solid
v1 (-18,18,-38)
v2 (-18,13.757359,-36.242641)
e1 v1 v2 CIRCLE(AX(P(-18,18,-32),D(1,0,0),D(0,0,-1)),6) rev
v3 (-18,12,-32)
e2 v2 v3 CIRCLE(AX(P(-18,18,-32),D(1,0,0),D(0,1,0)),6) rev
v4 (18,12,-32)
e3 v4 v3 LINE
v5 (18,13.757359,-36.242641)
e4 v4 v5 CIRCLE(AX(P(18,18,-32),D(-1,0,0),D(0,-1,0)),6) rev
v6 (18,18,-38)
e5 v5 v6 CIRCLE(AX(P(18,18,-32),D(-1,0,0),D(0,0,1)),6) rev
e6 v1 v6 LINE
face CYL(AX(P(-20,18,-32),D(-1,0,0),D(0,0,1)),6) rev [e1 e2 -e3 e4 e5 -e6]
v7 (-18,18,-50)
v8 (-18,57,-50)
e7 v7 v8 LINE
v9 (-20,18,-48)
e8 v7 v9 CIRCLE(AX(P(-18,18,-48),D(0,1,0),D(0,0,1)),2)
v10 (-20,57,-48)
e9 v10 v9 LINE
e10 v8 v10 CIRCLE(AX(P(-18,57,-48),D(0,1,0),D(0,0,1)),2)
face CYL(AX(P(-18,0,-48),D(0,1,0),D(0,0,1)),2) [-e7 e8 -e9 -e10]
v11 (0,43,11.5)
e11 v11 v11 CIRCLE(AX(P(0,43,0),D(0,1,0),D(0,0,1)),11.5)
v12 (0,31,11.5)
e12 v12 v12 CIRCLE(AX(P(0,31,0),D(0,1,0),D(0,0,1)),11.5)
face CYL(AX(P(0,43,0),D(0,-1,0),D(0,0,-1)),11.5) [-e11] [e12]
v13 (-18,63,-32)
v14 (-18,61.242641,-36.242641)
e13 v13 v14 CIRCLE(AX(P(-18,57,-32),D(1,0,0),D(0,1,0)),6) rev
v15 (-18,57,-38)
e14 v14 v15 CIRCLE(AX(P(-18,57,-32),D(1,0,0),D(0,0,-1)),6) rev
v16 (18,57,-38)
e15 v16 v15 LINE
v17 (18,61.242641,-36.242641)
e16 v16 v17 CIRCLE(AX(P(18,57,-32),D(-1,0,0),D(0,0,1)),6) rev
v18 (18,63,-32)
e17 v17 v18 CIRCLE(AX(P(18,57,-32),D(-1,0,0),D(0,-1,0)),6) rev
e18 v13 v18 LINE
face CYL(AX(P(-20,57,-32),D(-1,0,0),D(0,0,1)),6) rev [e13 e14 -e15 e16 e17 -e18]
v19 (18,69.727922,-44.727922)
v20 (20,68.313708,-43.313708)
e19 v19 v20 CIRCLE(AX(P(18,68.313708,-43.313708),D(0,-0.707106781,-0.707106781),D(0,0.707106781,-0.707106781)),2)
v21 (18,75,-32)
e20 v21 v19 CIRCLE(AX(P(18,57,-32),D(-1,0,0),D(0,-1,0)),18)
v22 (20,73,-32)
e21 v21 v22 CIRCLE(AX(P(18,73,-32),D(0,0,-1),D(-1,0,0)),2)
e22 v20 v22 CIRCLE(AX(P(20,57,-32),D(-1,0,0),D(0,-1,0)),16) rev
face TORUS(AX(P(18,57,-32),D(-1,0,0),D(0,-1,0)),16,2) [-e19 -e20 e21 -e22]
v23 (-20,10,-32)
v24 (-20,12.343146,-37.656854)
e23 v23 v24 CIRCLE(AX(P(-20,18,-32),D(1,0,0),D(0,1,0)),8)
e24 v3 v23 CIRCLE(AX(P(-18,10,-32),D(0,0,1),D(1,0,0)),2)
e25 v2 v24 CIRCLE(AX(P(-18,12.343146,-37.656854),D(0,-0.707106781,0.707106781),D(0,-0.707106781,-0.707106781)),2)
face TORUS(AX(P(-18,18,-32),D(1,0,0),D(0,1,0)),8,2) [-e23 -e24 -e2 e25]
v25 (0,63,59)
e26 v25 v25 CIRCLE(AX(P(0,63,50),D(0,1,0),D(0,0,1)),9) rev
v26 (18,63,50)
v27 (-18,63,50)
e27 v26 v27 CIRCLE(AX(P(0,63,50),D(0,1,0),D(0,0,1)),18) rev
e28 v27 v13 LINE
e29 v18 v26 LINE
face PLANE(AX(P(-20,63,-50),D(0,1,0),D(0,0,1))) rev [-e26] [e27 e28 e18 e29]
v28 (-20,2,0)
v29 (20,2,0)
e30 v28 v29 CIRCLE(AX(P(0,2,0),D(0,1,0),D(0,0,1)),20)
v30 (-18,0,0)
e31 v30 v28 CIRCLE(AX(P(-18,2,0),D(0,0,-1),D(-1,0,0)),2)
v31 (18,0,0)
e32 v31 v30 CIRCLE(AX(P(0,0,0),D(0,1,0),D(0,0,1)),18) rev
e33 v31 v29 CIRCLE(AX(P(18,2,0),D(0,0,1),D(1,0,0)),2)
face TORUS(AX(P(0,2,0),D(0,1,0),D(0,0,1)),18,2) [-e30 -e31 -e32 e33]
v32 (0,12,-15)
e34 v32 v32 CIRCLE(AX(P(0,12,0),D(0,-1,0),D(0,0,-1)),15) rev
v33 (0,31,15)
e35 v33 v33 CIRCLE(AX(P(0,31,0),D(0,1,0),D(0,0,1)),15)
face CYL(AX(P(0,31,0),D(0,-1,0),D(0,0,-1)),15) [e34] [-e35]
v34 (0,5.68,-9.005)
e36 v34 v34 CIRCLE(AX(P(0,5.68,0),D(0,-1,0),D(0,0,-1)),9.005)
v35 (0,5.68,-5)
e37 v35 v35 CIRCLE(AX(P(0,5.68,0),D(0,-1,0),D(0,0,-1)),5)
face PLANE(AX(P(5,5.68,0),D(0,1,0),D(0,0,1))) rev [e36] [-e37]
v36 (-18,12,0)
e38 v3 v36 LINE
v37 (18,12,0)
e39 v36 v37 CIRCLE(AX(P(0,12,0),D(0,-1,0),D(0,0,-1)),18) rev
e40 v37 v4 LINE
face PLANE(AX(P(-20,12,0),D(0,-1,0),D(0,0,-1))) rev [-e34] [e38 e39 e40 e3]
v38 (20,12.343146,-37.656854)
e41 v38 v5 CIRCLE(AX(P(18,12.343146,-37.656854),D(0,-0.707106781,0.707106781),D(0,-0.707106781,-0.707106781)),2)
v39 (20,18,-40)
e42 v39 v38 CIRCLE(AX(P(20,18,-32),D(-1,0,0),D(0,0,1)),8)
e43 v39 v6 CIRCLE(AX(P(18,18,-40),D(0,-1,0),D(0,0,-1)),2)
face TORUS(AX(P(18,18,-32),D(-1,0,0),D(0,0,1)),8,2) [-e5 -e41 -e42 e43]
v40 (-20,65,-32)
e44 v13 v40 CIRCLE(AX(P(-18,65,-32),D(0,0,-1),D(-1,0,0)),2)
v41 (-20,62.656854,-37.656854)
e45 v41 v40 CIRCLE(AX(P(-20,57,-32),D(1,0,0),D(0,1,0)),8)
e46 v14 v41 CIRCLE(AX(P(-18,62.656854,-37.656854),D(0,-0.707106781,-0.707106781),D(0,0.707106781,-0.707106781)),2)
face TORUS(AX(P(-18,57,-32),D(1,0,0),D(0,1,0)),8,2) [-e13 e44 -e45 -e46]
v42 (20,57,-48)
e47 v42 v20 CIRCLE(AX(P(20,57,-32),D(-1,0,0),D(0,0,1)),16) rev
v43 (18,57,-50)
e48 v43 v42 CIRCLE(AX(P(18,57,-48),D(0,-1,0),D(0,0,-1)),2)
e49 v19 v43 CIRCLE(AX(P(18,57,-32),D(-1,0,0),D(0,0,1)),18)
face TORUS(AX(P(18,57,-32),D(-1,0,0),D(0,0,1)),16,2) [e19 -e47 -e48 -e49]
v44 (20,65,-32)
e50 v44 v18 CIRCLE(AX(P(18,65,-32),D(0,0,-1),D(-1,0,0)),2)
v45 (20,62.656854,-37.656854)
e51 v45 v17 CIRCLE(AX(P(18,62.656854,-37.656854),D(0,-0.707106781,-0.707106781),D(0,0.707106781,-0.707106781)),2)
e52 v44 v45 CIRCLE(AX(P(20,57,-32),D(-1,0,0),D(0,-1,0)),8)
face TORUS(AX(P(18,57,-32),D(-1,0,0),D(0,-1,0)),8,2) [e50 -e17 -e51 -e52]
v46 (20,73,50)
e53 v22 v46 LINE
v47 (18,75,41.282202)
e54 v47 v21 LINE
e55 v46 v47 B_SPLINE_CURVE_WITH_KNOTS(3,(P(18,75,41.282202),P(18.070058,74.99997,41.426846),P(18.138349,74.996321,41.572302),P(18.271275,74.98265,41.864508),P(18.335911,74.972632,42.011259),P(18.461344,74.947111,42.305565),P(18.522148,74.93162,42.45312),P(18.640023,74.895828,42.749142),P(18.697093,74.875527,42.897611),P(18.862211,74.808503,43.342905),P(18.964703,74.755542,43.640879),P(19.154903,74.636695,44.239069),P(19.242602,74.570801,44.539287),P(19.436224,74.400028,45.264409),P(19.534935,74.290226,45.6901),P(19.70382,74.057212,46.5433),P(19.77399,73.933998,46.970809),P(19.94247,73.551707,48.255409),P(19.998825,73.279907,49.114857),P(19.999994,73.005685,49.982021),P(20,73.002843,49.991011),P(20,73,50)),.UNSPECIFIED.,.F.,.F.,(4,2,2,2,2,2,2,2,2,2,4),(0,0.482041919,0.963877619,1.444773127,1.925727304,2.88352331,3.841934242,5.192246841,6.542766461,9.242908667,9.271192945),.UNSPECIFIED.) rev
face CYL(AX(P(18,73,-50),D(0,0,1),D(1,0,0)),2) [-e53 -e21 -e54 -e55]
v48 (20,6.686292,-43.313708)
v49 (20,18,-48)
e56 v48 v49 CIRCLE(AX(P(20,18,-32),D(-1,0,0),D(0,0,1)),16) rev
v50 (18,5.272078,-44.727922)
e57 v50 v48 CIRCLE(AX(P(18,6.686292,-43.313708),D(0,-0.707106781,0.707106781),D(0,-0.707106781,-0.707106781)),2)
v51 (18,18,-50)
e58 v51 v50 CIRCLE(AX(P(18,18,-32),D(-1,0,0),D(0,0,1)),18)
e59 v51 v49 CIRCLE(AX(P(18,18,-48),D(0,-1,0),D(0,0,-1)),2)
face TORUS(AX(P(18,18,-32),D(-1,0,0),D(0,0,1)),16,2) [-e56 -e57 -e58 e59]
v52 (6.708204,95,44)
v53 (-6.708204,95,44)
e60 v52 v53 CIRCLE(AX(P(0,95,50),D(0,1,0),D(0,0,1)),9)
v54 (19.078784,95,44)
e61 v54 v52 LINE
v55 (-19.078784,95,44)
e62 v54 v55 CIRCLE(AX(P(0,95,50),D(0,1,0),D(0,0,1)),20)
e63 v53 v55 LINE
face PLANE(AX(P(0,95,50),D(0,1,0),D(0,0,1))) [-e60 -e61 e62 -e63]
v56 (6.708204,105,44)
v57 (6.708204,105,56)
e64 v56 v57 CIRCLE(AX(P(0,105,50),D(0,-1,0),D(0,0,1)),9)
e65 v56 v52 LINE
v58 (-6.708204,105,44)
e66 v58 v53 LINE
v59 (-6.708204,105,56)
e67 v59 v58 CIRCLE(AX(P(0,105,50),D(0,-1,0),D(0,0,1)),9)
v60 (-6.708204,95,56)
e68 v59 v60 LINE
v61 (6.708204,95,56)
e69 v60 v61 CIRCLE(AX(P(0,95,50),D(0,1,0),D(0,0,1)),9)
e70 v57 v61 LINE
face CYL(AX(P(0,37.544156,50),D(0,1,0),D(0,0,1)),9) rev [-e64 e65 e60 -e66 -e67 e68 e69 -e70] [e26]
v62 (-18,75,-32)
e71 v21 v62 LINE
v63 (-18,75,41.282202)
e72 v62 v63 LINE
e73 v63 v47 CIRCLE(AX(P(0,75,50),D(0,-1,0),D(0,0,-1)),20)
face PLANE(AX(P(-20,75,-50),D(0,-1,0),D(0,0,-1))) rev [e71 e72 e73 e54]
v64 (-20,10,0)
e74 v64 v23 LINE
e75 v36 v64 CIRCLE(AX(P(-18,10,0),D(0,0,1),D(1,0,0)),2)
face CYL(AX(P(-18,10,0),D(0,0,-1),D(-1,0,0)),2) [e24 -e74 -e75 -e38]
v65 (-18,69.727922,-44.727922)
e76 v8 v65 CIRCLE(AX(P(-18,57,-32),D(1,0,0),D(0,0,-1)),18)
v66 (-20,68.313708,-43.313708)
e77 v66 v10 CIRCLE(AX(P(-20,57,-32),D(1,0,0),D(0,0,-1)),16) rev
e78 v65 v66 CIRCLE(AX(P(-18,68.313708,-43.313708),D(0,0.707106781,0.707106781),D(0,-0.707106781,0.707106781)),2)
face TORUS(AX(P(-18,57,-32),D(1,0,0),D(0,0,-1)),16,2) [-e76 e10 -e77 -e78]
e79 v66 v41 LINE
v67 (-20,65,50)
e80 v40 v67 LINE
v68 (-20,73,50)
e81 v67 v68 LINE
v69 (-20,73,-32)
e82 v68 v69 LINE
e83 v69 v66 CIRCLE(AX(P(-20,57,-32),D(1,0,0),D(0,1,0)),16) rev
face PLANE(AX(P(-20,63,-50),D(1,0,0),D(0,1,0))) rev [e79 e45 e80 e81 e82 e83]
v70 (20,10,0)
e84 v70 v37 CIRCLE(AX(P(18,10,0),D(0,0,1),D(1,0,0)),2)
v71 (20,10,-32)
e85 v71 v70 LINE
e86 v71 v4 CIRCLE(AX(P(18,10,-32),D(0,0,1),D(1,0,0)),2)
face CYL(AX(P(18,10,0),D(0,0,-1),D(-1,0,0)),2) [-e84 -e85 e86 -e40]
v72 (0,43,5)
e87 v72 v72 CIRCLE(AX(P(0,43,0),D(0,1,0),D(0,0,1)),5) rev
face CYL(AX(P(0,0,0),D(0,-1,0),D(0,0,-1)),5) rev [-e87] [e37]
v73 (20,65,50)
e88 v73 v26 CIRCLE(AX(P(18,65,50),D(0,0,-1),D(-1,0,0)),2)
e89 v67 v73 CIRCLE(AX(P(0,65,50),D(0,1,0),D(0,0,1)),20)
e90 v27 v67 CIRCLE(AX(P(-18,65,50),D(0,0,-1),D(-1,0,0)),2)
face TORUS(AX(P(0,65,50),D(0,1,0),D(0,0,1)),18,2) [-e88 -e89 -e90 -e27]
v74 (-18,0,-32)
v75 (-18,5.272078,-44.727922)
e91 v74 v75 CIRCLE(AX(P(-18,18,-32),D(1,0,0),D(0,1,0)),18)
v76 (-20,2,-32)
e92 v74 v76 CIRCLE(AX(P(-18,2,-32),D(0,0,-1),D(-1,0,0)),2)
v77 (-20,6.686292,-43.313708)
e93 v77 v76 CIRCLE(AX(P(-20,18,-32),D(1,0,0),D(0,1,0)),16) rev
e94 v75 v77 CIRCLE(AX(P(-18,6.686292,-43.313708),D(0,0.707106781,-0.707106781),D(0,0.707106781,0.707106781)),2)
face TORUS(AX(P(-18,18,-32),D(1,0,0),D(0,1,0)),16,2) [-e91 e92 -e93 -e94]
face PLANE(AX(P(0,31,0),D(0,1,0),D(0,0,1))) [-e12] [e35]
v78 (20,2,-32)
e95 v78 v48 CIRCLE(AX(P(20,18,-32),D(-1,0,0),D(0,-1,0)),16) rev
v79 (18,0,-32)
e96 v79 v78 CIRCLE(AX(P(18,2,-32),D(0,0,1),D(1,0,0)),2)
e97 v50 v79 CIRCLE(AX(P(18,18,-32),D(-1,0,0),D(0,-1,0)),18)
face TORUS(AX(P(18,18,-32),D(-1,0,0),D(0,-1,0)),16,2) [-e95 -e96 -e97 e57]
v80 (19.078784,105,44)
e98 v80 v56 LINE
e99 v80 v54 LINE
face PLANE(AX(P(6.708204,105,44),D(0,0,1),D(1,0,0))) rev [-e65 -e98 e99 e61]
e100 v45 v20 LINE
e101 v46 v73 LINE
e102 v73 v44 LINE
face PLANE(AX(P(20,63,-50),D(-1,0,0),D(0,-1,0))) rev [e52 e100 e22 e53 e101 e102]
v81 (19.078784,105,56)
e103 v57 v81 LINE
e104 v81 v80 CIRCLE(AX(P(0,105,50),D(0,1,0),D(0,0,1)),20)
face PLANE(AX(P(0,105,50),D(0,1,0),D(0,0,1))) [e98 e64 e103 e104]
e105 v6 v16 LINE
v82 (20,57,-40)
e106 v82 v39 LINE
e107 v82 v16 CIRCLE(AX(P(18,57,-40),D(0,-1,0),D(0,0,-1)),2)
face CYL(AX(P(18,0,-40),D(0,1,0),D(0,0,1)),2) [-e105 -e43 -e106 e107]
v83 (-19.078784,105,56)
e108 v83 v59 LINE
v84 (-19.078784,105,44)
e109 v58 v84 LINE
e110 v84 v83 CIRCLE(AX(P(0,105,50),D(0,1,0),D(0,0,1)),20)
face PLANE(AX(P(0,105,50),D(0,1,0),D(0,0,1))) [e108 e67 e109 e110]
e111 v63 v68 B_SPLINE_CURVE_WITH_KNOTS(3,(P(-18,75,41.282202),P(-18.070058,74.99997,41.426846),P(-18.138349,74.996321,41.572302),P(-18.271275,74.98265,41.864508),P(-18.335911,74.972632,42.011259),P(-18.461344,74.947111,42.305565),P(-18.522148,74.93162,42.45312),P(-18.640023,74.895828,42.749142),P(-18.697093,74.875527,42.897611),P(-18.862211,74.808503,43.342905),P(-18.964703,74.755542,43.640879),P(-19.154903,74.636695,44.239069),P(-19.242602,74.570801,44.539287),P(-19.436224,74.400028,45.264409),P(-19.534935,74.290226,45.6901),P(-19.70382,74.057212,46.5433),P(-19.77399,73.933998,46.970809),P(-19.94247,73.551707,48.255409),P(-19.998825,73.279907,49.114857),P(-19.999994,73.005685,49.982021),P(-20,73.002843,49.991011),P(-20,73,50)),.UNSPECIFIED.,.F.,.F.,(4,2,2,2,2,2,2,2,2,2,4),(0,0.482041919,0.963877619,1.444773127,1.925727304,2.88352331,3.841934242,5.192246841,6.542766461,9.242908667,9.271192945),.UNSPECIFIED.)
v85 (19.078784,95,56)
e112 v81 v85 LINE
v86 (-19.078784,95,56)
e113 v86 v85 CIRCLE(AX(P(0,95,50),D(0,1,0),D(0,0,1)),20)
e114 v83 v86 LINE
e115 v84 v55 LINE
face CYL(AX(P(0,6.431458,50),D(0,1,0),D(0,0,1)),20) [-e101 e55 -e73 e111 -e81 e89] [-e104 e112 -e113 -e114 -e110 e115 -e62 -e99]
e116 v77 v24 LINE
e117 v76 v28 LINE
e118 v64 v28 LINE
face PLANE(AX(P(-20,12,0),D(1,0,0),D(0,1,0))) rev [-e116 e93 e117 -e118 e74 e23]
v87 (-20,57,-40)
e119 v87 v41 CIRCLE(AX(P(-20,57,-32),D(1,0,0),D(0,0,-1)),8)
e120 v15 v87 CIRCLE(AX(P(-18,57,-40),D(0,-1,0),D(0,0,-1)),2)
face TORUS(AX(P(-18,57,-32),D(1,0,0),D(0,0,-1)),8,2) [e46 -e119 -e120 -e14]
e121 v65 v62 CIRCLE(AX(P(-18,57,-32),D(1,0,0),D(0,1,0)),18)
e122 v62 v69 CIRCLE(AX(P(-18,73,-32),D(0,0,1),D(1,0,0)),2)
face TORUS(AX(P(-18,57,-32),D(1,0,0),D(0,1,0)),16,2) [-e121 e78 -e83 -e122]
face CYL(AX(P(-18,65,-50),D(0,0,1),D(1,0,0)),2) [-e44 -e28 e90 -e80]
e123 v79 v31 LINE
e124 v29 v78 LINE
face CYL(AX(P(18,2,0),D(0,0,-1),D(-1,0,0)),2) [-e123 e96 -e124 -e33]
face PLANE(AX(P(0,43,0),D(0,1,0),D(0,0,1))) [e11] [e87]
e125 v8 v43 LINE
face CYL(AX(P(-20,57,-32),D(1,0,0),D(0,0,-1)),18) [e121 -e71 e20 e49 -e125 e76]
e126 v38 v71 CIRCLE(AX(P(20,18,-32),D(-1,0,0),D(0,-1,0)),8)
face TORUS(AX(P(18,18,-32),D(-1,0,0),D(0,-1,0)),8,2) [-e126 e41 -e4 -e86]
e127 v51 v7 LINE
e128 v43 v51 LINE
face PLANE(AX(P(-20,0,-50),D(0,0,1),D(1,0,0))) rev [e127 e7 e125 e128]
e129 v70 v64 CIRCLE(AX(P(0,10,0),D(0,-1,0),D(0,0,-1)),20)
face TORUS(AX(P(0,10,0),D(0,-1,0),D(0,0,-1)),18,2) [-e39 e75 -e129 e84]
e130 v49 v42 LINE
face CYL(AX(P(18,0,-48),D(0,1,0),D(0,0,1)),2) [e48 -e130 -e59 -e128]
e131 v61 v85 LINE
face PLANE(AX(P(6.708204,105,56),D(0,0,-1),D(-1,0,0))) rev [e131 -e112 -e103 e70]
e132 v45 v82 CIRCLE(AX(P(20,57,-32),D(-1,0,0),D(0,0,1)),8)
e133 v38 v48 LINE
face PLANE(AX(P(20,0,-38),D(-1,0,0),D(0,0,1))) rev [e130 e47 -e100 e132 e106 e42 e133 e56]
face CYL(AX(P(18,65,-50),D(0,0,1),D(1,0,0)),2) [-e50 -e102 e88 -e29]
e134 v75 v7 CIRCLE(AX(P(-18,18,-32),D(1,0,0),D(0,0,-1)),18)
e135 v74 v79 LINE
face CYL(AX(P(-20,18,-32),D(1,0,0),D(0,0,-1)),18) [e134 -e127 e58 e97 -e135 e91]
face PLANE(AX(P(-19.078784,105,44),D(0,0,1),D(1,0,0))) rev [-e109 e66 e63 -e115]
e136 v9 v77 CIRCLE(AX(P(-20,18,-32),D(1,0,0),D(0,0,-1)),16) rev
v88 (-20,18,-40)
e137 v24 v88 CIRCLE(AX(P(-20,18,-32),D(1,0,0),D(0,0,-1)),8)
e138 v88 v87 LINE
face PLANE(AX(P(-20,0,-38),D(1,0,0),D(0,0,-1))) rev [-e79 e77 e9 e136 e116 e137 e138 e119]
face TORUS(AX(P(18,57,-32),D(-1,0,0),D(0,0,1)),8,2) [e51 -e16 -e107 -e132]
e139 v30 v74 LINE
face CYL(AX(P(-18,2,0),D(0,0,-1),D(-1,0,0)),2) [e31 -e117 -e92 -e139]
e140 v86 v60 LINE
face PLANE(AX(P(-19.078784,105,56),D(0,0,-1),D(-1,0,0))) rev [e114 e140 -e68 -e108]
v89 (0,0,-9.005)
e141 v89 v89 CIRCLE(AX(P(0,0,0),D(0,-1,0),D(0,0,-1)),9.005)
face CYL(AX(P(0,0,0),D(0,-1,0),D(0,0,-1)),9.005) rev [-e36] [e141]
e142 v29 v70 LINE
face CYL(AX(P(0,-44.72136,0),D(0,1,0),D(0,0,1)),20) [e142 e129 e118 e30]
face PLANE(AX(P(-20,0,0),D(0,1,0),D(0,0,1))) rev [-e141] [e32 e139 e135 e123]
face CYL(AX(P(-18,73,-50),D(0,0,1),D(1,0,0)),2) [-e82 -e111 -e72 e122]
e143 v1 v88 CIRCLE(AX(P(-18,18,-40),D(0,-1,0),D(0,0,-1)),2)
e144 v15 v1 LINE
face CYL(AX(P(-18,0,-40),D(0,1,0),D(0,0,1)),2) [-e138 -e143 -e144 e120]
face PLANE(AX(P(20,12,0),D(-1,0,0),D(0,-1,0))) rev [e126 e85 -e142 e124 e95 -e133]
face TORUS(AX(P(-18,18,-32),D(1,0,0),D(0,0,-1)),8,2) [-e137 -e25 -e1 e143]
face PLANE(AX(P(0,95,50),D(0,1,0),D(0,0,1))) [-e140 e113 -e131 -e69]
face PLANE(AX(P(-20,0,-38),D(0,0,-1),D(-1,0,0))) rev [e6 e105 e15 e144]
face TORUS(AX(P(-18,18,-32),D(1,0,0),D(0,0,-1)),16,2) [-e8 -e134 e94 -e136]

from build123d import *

# Parameters (mm, degrees)
SKETCH3_W                               = 40
SKETCH3_H                               = 12
BOSS_EXTRUDE1_DEPTH                     = 12
SKETCH5_R                               = 20
BOSS_EXTRUDE2_DEPTH                     = 20
BOSS_EXTRUDE2_DIRECTION_2_REACH         = 94.331
SKETCH7_R                               = 11.5
BOSS_EXTRUDE4_DEPTH                     = 31
SKETCH8_R                               = 15
BOSS_EXTRUDE5_DEPTH                     = 19
SKETCH9_R                               = 9
CUT_EXTRUDE1_DEPTH                      = 32
BOSS_EXTRUDE6_START                     = 10
BOSS_EXTRUDE6_DEPTH                     = 10
CBORE_FOR_M8_HEX_HEAD_BOLT1_D           = 10
CBORE_FOR_M8_HEX_HEAD_BOLT1_DEPTH       = 43
CBORE_FOR_M8_HEX_HEAD_BOLT1_CBORE_D     = 18.01
CBORE_FOR_M8_HEX_HEAD_BOLT1_CBORE_DEPTH = 5.68
CBORE_FOR_M8_HEX_HEAD_BOLT1_TIP         = 3.004303095
FILLET2_R                               = 18
FILLET3_R                               = 2
FILLET4_R                               = 6
FILLET5_R                               = 2


with BuildPart() as part:
    # Sweep1: sweep along a path in Sketch2
    with BuildLine(Plane(origin=(0, 0, 0), x_dir=(0, 0, -1), z_dir=(1, 0, 0))) as sweep1_path:
        Line((0, 0), (50, 0))
        Line((50, 0), (50, 75))
        Line((50, 75), (-50, 75))
    # Sketch3 → Sweep1 (sweep)
    with BuildSketch(Plane.XY):
        with Locations((0, 6)):
            Rectangle(SKETCH3_W, SKETCH3_H)
    sweep(path=sweep1_path.line, transition=Transition.RIGHT)

    # Sketch4 → Boss-Extrude1 (add)
    with BuildSketch(Plane(origin=(0, 12, 0), x_dir=(1, 0, 0), z_dir=(0, 1, 0))):
        with BuildLine():
            Line((-20, 0), (20, 0))
            ThreePointArc((20, 0), (0, -20), (-20, 0))
        make_face()
    extrude(amount=-BOSS_EXTRUDE1_DEPTH)

    # Sketch5 → Boss-Extrude2 (add)
    with BuildSketch(Plane(origin=(0, 75, 0), x_dir=(1, 0, 0), z_dir=(0, 1, 0))):
        with Locations(Location((0, -50, 0), (0, 0, 270))):
            Circle(SKETCH5_R)
    extrude(amount=BOSS_EXTRUDE2_DEPTH)

    # Boss-Extrude2 direction 2: up to this face of the body (flat: up to its plane)
    boss_extrude2_direction_2_end = Plane(part.part.faces().sort_by_distance((0, 63, 6))[0])
    # Sketch5 → Boss-Extrude2 direction 2 (add, up to the picked face)
    with BuildSketch(Plane(origin=(0, 75, 0), x_dir=(1, 0, 0), z_dir=(0, 1, 0)), mode=Mode.PRIVATE) as boss_extrude2_direction_2_sk1:
        with Locations(Location((0, -50, 0), (0, 0, 270))):
            Circle(SKETCH5_R)
    boss_extrude2_direction_2_tool1 = split(extrude(boss_extrude2_direction_2_sk1.sketch, amount=-BOSS_EXTRUDE2_DIRECTION_2_REACH, mode=Mode.PRIVATE), bisect_by=boss_extrude2_direction_2_end, keep=Keep.BOTH, mode=Mode.PRIVATE)
    add(boss_extrude2_direction_2_tool1.solids().sort_by(Axis((0, 75, 50), (0, -1, 0)))[0])

    # Sketch7 → Boss-Extrude4 (add)
    with BuildSketch(Plane(origin=(0, 12, 0), x_dir=(1, 0, 0), z_dir=(0, 1, 0))):
        with Locations(Location((0, 0, 0), (0, 0, 90))):
            Circle(SKETCH7_R)
    extrude(amount=BOSS_EXTRUDE4_DEPTH)

    # Sketch8 → Boss-Extrude5 (add)
    with BuildSketch(Plane(origin=(0, 12, 0), x_dir=(1, 0, 0), z_dir=(0, 1, 0))):
        with Locations(Location((0, 0, 0), (0, 0, 90))):
            Circle(SKETCH8_R)
    extrude(amount=BOSS_EXTRUDE5_DEPTH)

    # Sketch9 → Cut-Extrude1 (cut)
    with BuildSketch(Plane(origin=(0, 95, 0), x_dir=(1, 0, 0), z_dir=(0, 1, 0))):
        with Locations(Location((0, -50, 0), (0, 0, 270))):
            Circle(SKETCH9_R)
    extrude(amount=-CUT_EXTRUDE1_DEPTH, mode=Mode.SUBTRACT)

    # Sketch10 → Boss-Extrude6 (add)
    with BuildSketch(Plane(origin=(0, 95, 0), x_dir=(1, 0, 0), z_dir=(0, 1, 0)).offset(BOSS_EXTRUDE6_START)):
        with BuildLine():
            Line((-19.078784028, -44), (-6.708203932, -44))
            ThreePointArc((-6.708203932, -44), (-9, -50), (-6.708203932, -56))
            Line((-6.708203932, -56), (-19.078784028, -56))
            ThreePointArc((-19.078784028, -56), (-20, -50), (-19.078784028, -44))
        make_face()
        with BuildLine():
            Line((6.708203932, -44), (19.078784028, -44))
            ThreePointArc((19.078784028, -44), (20, -50), (19.078784028, -56))
            Line((19.078784028, -56), (6.708203932, -56))
            ThreePointArc((6.708203932, -56), (9, -50), (6.708203932, -44))
        make_face()
    extrude(amount=-BOSS_EXTRUDE6_DEPTH)

    # CBORE for M8 Hex Head Bolt1
    with Locations(Plane(origin=(0, 0, 0), x_dir=(-1, 0, 0), z_dir=(0, -1, 0))):
        with Locations((0, 0)):
            CounterBoreHole(CBORE_FOR_M8_HEX_HEAD_BOLT1_D / 2, CBORE_FOR_M8_HEX_HEAD_BOLT1_CBORE_D / 2, CBORE_FOR_M8_HEX_HEAD_BOLT1_CBORE_DEPTH, depth=CBORE_FOR_M8_HEX_HEAD_BOLT1_DEPTH)
            with Locations((0, 0, -(CBORE_FOR_M8_HEX_HEAD_BOLT1_DEPTH + CBORE_FOR_M8_HEX_HEAD_BOLT1_TIP / 2))):  # 118° drill point
                Cone(0, CBORE_FOR_M8_HEX_HEAD_BOLT1_D / 2, CBORE_FOR_M8_HEX_HEAD_BOLT1_TIP, mode=Mode.SUBTRACT)

    # Fillet2
    fillet2_edges = [part.edges().sort_by_distance(p)[0] for p in [
        (0, 75, -50),
        (0, 0, -50),
    ]]
    fillet(fillet2_edges, radius=FILLET2_R)

    # Fillet3
    # the kernel refuses this fillet: 2 mm, written as the material it takes off along each edge
    with BuildSketch(Plane(origin=(20, 18, -32), x_dir=(0, -1, 0), z_dir=(0, 0, 1))) as fillet3_piece_1:
        with BuildLine():
            CenterArc((18 - FILLET3_R, -FILLET3_R), FILLET3_R, 0, 90)
            Line((18 - FILLET3_R, 0), (18, 0))
            Line((18, 0), (18, -FILLET3_R))
        make_face()
    revolve(axis=Axis((20, 18, -32), (1, 0, 0)), revolution_arc=90, mode=Mode.SUBTRACT)
    with BuildSketch(Plane(origin=(20, 18, -50), x_dir=(0, 0, 1), z_dir=(0, 1, 0))) as fillet3_piece_2:
        with BuildLine():
            CenterArc((FILLET3_R, -FILLET3_R), FILLET3_R, 90, 90)
            Line((0, -FILLET3_R), (0, 0))
            Line((0, 0), (FILLET3_R, 0))
        make_face()
    extrude(amount=39, mode=Mode.SUBTRACT)
    with BuildSketch(Plane(origin=(20, 57, -32), x_dir=(0, 0, -1), z_dir=(0, -1, 0))) as fillet3_piece_3:
        with BuildLine():
            CenterArc((18 - FILLET3_R, -FILLET3_R), FILLET3_R, 360, 90)
            Line((18, -FILLET3_R), (18, 0))
            Line((18, 0), (18 - FILLET3_R, 0))
        make_face()
    revolve(axis=Axis((20, 57, -32), (1, 0, 0)), revolution_arc=90, mode=Mode.SUBTRACT)
    with BuildSketch(Plane(origin=(-20, 18, -50), x_dir=(0, 0, 1), z_dir=(0, 1, 0))) as fillet3_piece_4:
        with BuildLine():
            CenterArc((FILLET3_R, FILLET3_R), FILLET3_R, 180, 90)
            Line((0, FILLET3_R), (0, 0))
            Line((0, 0), (FILLET3_R, 0))
        make_face()
    extrude(amount=39, mode=Mode.SUBTRACT)
    with BuildSketch(Plane(origin=(-20, 57, -32), x_dir=(0, 0, -1), z_dir=(0, -1, 0))) as fillet3_piece_5:
        with BuildLine():
            CenterArc((18 - FILLET3_R, FILLET3_R), FILLET3_R, 270, 90)
            Line((18, FILLET3_R), (18, 0))
            Line((18, 0), (18 - FILLET3_R, 0))
        make_face()
    revolve(axis=Axis((-20, 57, -32), (1, 0, 0)), revolution_arc=90, mode=Mode.SUBTRACT)
    with BuildSketch(Plane(origin=(-20, 18, -32), x_dir=(0, -1, 0), z_dir=(0, 0, 1))) as fillet3_piece_6:
        with BuildLine():
            CenterArc((18 - FILLET3_R, FILLET3_R), FILLET3_R, 270, 90)
            Line((18, FILLET3_R), (18, 0))
            Line((18, 0), (18 - FILLET3_R, 0))
        make_face()
    revolve(axis=Axis((-20, 18, -32), (1, 0, 0)), revolution_arc=90, mode=Mode.SUBTRACT)
    with BuildSketch(Plane(origin=(20, 75, -32), x_dir=(0, -1, 0), z_dir=(0, 0, 1))) as fillet3_piece_7_section:
        with BuildLine():
            CenterArc((FILLET3_R, -FILLET3_R), FILLET3_R, 90, 90)
            Line((0, -FILLET3_R), (0, 0))
            Line((0, 0), (FILLET3_R, 0))
        make_face()
    fillet3_piece_7 = extrude(amount=87, mode=Mode.PRIVATE)
    fillet3_piece_7 = fillet3_piece_7 - Plane(origin=(0, 74.534164158, 50), x_dir=(0, 0, 1), z_dir=(0, -1, 0)) * Cylinder(20, 183, mode=Mode.PRIVATE)
    add(fillet3_piece_7, mode=Mode.SUBTRACT)
    with BuildSketch(Plane(origin=(-20, 75, -32), x_dir=(0, -1, 0), z_dir=(0, 0, 1))) as fillet3_piece_8_section:
        with BuildLine():
            CenterArc((FILLET3_R, FILLET3_R), FILLET3_R, 180, 90)
            Line((0, FILLET3_R), (0, 0))
            Line((0, 0), (FILLET3_R, 0))
        make_face()
    fillet3_piece_8 = extrude(amount=87, mode=Mode.PRIVATE)
    fillet3_piece_8 = fillet3_piece_8 - Plane(origin=(0, 74.534164167, 50), x_dir=(0, 0, 1), z_dir=(0, -1, 0)) * Cylinder(20, 183, mode=Mode.PRIVATE)
    add(fillet3_piece_8, mode=Mode.SUBTRACT)
    with BuildSketch(Plane(origin=(-20, 0, 0), x_dir=(1, 0, 0), z_dir=(0, 0, -1))) as fillet3_piece_9:
        with BuildLine():
            CenterArc((FILLET3_R, -FILLET3_R), FILLET3_R, 90, 90)
            Line((0, -FILLET3_R), (0, 0))
            Line((0, 0), (FILLET3_R, 0))
        make_face()
    extrude(amount=32, mode=Mode.SUBTRACT)
    with BuildSketch(Plane(origin=(0, 0, 0), x_dir=(1, 0, 0), z_dir=(0, 0, -1))) as fillet3_piece_10:
        with BuildLine():
            CenterArc((20 - FILLET3_R, -FILLET3_R), FILLET3_R, 0, 90)
            Line((20, -FILLET3_R), (20, 0))
            Line((20, 0), (20 - FILLET3_R, 0))
        make_face()
    revolve(axis=Axis((0, 0, 0), (0, -1, 0)), revolution_arc=180, mode=Mode.SUBTRACT)
    with BuildSketch(Plane(origin=(20, 0, 0), x_dir=(-1, 0, 0), z_dir=(0, 0, -1))) as fillet3_piece_11:
        with BuildLine():
            CenterArc((FILLET3_R, FILLET3_R), FILLET3_R, 180, 90)
            Line((0, FILLET3_R), (0, 0))
            Line((0, 0), (FILLET3_R, 0))
        make_face()
    extrude(amount=32, mode=Mode.SUBTRACT)

    # Fillet4
    fillet4_edges = [part.edges().sort_by_distance(p)[0] for p in [
        (0, 63, -38),
        (0, 12, -38),
    ]]
    fillet(fillet4_edges, radius=FILLET4_R)

    # Fillet5
    fillet5_edges = [part.edges().sort_by_distance(p)[0] for p in [
        (20, 63, 9),
        (-20, 63, 9),
        (-20, 37.5, -38),
        (20, 37.5, -38),
        (20, 61.242640687, -36.242640687),
        (20, 61.242640687, -36.242640687),
        (-20, 61.242640687, -36.242640687),
        (-20, 61.242640687, -36.242640687),
        (20, 13.757359313, -36.242640687),
        (20, 13.757359313, -36.242640687),
        (-20, 13.757359313, -36.242640687),
        (-20, 13.757359313, -36.242640687),
        (-20, 12, -16),
        (0, 12, 20),
        (20, 12, -16),
        (-14.142135624, 63, 64.142135624),
    ]]
    fillet(fillet5_edges, radius=FILLET5_R)


solid = part.part
